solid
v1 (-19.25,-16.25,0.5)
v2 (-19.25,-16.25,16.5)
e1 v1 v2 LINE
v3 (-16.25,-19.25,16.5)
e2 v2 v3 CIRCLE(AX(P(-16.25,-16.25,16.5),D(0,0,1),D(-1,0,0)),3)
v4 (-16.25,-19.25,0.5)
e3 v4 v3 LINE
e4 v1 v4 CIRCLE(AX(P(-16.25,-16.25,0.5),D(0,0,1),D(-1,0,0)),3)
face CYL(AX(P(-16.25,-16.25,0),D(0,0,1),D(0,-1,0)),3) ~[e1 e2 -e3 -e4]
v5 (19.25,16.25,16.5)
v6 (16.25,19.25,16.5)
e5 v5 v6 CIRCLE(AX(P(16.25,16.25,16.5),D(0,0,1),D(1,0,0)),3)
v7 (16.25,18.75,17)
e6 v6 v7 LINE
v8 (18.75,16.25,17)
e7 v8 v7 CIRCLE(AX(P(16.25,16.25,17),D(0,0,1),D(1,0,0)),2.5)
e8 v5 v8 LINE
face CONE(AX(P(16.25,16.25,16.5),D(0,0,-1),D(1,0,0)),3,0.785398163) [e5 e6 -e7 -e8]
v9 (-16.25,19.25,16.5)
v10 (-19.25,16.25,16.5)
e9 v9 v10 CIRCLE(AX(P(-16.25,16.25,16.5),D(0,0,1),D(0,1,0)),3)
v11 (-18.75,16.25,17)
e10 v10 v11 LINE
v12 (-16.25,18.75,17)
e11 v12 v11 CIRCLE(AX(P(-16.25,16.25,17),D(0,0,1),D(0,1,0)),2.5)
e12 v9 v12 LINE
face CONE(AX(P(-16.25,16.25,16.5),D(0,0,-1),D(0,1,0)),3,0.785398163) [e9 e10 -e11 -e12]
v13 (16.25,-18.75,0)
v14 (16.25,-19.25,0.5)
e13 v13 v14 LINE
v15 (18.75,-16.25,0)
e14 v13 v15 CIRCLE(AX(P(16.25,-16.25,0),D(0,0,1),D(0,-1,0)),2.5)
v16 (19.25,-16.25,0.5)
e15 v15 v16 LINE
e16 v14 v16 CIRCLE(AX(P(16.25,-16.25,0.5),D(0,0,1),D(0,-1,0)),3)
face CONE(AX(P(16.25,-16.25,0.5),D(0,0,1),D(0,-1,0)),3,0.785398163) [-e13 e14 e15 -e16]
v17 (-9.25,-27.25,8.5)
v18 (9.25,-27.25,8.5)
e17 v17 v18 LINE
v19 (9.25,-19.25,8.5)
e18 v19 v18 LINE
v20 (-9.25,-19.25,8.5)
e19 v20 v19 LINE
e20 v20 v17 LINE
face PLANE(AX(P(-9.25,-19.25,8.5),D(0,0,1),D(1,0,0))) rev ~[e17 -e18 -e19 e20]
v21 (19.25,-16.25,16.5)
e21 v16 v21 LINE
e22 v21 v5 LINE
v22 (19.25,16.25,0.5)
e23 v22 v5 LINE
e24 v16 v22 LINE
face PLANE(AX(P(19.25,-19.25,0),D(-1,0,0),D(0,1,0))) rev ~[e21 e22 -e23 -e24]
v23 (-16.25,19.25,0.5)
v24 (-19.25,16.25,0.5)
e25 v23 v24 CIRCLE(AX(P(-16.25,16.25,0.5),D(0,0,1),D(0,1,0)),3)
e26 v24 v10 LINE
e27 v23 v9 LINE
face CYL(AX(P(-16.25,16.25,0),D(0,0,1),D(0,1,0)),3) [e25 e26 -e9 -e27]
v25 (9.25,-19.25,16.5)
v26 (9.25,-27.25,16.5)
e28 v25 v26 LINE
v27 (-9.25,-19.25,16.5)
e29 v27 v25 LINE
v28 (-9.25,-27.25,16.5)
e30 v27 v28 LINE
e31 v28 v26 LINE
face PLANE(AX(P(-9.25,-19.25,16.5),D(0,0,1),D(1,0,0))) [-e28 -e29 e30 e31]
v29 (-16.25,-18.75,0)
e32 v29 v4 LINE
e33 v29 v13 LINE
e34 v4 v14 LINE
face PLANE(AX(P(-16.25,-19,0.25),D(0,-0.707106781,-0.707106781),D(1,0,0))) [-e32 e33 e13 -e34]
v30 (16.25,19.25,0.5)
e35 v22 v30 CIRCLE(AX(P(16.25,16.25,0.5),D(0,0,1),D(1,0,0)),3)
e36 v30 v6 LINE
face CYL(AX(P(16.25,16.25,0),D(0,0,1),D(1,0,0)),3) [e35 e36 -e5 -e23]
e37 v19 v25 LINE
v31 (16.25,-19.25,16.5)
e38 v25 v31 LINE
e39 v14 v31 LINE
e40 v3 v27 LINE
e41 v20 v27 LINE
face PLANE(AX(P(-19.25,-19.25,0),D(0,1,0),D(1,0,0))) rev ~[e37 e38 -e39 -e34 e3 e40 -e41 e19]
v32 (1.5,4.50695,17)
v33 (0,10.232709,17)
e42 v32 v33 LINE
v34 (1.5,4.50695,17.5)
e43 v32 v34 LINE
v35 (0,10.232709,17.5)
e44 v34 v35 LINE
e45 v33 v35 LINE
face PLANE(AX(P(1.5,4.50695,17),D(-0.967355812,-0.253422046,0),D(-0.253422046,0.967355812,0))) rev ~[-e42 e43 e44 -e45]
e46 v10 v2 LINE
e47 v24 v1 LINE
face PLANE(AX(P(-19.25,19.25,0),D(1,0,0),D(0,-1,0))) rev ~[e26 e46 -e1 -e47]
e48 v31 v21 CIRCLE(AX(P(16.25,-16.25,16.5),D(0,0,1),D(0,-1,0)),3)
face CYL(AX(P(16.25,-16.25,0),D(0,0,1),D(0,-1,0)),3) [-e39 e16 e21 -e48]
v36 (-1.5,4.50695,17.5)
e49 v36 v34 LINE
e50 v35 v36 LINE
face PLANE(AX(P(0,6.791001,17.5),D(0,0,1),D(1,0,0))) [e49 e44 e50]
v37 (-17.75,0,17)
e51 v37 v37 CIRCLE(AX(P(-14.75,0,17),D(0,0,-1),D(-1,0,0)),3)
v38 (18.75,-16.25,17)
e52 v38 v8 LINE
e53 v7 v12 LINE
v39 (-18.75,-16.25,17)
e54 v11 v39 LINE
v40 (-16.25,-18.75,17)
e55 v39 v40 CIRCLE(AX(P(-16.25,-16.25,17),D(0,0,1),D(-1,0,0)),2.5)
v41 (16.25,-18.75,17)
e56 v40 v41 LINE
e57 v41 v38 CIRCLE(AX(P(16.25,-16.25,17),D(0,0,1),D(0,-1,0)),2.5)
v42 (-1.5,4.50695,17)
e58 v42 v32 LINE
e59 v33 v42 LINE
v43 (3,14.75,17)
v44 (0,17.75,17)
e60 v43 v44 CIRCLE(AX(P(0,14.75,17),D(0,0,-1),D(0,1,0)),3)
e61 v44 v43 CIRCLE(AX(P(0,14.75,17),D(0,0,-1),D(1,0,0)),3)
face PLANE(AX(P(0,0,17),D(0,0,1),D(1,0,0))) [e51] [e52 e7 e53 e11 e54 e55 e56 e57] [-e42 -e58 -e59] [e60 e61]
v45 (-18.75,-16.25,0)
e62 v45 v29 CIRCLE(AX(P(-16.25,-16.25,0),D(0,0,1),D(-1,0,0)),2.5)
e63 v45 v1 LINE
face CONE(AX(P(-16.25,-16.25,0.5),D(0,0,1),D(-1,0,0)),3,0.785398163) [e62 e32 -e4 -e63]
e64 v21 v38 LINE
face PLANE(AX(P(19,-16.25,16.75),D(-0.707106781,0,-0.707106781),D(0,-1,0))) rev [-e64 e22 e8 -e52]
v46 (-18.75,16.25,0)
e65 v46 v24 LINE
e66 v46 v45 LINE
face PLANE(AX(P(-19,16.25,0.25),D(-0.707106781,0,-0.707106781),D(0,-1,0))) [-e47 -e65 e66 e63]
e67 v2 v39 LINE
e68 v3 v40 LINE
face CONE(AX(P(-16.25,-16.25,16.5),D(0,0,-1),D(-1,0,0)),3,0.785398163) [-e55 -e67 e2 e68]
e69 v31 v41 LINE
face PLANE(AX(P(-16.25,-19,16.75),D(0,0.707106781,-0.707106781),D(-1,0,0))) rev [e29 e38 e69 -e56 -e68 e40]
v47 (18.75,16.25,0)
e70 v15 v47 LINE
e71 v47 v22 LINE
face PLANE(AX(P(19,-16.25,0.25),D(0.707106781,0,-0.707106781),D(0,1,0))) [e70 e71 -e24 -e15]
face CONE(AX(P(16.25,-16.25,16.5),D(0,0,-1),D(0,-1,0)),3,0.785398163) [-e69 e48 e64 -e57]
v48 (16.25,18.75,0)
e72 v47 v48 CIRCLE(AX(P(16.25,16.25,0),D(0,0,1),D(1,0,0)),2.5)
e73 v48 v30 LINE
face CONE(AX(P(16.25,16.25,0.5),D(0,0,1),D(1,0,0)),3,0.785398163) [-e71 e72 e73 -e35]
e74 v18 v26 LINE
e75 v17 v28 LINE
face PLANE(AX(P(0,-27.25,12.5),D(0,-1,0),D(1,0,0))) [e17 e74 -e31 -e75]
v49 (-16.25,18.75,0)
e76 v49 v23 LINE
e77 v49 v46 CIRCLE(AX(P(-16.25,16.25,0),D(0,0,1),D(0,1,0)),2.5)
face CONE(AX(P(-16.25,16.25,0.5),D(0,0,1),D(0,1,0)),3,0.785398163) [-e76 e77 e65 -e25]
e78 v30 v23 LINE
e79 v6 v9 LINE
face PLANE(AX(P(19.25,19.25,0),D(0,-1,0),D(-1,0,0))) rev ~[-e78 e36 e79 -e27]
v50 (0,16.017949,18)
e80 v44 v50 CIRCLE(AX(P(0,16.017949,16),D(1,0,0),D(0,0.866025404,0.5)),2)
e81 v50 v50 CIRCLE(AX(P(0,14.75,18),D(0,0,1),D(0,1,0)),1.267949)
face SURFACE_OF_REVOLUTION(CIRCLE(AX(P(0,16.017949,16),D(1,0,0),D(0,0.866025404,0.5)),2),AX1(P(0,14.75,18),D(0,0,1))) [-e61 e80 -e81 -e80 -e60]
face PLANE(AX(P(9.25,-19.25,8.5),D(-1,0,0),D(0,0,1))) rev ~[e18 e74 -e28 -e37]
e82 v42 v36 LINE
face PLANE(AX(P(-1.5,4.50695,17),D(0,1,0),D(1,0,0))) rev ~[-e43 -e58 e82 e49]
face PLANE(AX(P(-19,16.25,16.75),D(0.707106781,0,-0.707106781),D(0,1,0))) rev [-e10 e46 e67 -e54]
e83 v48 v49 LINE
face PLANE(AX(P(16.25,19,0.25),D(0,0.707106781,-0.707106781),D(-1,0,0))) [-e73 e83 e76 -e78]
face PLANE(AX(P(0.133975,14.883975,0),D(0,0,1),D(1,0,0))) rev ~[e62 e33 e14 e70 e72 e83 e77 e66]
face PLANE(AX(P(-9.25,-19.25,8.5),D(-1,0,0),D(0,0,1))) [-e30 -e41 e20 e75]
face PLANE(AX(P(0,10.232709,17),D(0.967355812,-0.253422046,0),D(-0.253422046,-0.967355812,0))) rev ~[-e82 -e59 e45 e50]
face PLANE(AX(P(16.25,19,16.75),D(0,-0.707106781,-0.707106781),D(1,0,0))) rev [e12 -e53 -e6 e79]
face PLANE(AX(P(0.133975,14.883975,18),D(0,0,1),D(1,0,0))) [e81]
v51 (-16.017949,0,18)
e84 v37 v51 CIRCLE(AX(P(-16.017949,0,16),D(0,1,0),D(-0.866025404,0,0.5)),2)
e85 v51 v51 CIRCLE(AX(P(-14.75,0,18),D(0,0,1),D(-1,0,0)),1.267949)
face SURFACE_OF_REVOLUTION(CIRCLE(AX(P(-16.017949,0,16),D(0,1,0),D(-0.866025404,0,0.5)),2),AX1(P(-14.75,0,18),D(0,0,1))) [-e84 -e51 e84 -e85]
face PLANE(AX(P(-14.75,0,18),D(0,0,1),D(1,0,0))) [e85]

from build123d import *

# Parameters (mm, degrees)
F1_DEPTH = 17
F3_DEPTH = 0.5
F4_DEPTH = 18
F6_R     = 3
F7_SIZE  = 0.5
F8_W     = 18.5
F8_H     = 8
F9_DEPTH = 8


# Not quite as in the source:
# - a fillet or chamfer that OpenCascade refuses, or shapes differently, is made with other operations: its cross-section is extruded or revolved along the edge and cut away or added


with BuildPart() as f1:
    # F0 (on Top) → F1 (new body)
    with BuildSketch(Plane.XY):
        Polygon((-19.25, -19.25), (19.25, -19.25), (19.25, 19.25), (0, 19.25), (-19.25, 19.25), (-19.25, 0), align=None)
        with BuildLine():
            ThreePointArc((-11.75, 0), (-14.75, -3), (-17.75, 0))
            ThreePointArc((-17.75, 0), (-14.75, 3), (-11.75, 0))
        make_face(mode=Mode.SUBTRACT)
        with BuildLine():
            ThreePointArc((3, 14.75), (-2.1213203436, 12.6286796564), (0, 17.75))
            ThreePointArc((0, 17.75), (2.1213203436, 16.8713203436), (3, 14.75))
        make_face(mode=Mode.SUBTRACT)
        with BuildLine():
            ThreePointArc((-11.75, 0), (-14.75, 3), (-17.75, 0))
            ThreePointArc((-17.75, 0), (-14.75, -3), (-11.75, 0))
        make_face()
        with BuildLine():
            ThreePointArc((3, 14.75), (2.1213203436, 16.8713203436), (0, 17.75))
            ThreePointArc((0, 17.75), (-2.1213203436, 12.6286796564), (3, 14.75))
        make_face()
    extrude(amount=F1_DEPTH)

    # F2 (on face) → F3 (join)
    with BuildSketch(Plane.XY.offset(17)):
        Polygon((-1.5, 4.5069497171), (1.5, 4.5069497171), (0, 10.2327093482), align=None)
    extrude(amount=F3_DEPTH)

    # F0 (on Top) → F4 (join)
    with BuildSketch(Plane.XY):
        with BuildLine():
            ThreePointArc((3, 14.75), (2.1213203436, 16.8713203436), (0, 17.75))
            ThreePointArc((0, 17.75), (-2.1213203436, 12.6286796564), (3, 14.75))
        make_face()
        with BuildLine():
            ThreePointArc((-11.75, 0), (-14.75, 3), (-17.75, 0))
            ThreePointArc((-17.75, 0), (-14.75, -3), (-11.75, 0))
        make_face()
    extrude(amount=F4_DEPTH)

    # F5: fillet of radius 2 on 2 edges, made by hand

    # F5_s1 → F5_t2 (revolve, cut)
    with BuildSketch(Plane.YZ):
        with BuildLine():
            ThreePointArc((17.75, 17), (17.0179491924, 17.7320508076), (16.0179491924, 18))
            Line((16.0179491924, 18), (17.75, 18))
            Line((17.75, 18), (17.75, 17))
        make_face()
    revolve(axis=Axis((0, 14.75, 18), (0, 0, 1)), mode=Mode.SUBTRACT)

    # F5_s3 → F5_t4 (revolve, cut)
    with BuildSketch(Plane.XZ):
        with BuildLine():
            ThreePointArc((-17.75, 17), (-17.0179491924, 17.7320508076), (-16.0179491924, 18))
            Line((-16.0179491924, 18), (-17.75, 18))
            Line((-17.75, 18), (-17.75, 17))
        make_face()
    revolve(axis=Axis((-14.75, 0, 18), (0, 0, 1)), mode=Mode.SUBTRACT)

    # F6
    f6_edges = [f1.edges().sort_by_distance(p)[0] for p in [
        (19.25, -19.25, 8.5),
        (-19.25, -19.25, 8.5),
        (-19.25, 19.25, 8.5),
        (19.25, 19.25, 8.5),
    ]]
    fillet(f6_edges, radius=F6_R)

    # F7
    f7_edges = [f1.edges().sort_by_distance(p)[0] for p in [
        (0, 19.25, 17),
        (18.37132, 18.37132, 17),
        (19.25, 0, 17),
        (18.37132, -18.37132, 17),
        (0, -19.25, 17),
        (-18.37132, -18.37132, 17),
        (-19.25, 0, 17),
        (-18.37132, 18.37132, 17),
        (0, -19.25, 0),
        (-18.37132, -18.37132, 0),
        (18.37132, -18.37132, 0),
        (-19.25, 0, 0),
        (19.25, 0, 0),
        (-18.37132, 18.37132, 0),
        (18.37132, 18.37132, 0),
        (0, 19.25, 0),
    ]]
    chamfer(f7_edges, length=F7_SIZE)

    # F8 (on face) → F9 (join)
    with BuildSketch(Plane.XZ.offset(19.25)):
        with Locations((0, 12.5)):
            Rectangle(F8_W, F8_H)
    extrude(amount=F9_DEPTH)


solid = f1.part
